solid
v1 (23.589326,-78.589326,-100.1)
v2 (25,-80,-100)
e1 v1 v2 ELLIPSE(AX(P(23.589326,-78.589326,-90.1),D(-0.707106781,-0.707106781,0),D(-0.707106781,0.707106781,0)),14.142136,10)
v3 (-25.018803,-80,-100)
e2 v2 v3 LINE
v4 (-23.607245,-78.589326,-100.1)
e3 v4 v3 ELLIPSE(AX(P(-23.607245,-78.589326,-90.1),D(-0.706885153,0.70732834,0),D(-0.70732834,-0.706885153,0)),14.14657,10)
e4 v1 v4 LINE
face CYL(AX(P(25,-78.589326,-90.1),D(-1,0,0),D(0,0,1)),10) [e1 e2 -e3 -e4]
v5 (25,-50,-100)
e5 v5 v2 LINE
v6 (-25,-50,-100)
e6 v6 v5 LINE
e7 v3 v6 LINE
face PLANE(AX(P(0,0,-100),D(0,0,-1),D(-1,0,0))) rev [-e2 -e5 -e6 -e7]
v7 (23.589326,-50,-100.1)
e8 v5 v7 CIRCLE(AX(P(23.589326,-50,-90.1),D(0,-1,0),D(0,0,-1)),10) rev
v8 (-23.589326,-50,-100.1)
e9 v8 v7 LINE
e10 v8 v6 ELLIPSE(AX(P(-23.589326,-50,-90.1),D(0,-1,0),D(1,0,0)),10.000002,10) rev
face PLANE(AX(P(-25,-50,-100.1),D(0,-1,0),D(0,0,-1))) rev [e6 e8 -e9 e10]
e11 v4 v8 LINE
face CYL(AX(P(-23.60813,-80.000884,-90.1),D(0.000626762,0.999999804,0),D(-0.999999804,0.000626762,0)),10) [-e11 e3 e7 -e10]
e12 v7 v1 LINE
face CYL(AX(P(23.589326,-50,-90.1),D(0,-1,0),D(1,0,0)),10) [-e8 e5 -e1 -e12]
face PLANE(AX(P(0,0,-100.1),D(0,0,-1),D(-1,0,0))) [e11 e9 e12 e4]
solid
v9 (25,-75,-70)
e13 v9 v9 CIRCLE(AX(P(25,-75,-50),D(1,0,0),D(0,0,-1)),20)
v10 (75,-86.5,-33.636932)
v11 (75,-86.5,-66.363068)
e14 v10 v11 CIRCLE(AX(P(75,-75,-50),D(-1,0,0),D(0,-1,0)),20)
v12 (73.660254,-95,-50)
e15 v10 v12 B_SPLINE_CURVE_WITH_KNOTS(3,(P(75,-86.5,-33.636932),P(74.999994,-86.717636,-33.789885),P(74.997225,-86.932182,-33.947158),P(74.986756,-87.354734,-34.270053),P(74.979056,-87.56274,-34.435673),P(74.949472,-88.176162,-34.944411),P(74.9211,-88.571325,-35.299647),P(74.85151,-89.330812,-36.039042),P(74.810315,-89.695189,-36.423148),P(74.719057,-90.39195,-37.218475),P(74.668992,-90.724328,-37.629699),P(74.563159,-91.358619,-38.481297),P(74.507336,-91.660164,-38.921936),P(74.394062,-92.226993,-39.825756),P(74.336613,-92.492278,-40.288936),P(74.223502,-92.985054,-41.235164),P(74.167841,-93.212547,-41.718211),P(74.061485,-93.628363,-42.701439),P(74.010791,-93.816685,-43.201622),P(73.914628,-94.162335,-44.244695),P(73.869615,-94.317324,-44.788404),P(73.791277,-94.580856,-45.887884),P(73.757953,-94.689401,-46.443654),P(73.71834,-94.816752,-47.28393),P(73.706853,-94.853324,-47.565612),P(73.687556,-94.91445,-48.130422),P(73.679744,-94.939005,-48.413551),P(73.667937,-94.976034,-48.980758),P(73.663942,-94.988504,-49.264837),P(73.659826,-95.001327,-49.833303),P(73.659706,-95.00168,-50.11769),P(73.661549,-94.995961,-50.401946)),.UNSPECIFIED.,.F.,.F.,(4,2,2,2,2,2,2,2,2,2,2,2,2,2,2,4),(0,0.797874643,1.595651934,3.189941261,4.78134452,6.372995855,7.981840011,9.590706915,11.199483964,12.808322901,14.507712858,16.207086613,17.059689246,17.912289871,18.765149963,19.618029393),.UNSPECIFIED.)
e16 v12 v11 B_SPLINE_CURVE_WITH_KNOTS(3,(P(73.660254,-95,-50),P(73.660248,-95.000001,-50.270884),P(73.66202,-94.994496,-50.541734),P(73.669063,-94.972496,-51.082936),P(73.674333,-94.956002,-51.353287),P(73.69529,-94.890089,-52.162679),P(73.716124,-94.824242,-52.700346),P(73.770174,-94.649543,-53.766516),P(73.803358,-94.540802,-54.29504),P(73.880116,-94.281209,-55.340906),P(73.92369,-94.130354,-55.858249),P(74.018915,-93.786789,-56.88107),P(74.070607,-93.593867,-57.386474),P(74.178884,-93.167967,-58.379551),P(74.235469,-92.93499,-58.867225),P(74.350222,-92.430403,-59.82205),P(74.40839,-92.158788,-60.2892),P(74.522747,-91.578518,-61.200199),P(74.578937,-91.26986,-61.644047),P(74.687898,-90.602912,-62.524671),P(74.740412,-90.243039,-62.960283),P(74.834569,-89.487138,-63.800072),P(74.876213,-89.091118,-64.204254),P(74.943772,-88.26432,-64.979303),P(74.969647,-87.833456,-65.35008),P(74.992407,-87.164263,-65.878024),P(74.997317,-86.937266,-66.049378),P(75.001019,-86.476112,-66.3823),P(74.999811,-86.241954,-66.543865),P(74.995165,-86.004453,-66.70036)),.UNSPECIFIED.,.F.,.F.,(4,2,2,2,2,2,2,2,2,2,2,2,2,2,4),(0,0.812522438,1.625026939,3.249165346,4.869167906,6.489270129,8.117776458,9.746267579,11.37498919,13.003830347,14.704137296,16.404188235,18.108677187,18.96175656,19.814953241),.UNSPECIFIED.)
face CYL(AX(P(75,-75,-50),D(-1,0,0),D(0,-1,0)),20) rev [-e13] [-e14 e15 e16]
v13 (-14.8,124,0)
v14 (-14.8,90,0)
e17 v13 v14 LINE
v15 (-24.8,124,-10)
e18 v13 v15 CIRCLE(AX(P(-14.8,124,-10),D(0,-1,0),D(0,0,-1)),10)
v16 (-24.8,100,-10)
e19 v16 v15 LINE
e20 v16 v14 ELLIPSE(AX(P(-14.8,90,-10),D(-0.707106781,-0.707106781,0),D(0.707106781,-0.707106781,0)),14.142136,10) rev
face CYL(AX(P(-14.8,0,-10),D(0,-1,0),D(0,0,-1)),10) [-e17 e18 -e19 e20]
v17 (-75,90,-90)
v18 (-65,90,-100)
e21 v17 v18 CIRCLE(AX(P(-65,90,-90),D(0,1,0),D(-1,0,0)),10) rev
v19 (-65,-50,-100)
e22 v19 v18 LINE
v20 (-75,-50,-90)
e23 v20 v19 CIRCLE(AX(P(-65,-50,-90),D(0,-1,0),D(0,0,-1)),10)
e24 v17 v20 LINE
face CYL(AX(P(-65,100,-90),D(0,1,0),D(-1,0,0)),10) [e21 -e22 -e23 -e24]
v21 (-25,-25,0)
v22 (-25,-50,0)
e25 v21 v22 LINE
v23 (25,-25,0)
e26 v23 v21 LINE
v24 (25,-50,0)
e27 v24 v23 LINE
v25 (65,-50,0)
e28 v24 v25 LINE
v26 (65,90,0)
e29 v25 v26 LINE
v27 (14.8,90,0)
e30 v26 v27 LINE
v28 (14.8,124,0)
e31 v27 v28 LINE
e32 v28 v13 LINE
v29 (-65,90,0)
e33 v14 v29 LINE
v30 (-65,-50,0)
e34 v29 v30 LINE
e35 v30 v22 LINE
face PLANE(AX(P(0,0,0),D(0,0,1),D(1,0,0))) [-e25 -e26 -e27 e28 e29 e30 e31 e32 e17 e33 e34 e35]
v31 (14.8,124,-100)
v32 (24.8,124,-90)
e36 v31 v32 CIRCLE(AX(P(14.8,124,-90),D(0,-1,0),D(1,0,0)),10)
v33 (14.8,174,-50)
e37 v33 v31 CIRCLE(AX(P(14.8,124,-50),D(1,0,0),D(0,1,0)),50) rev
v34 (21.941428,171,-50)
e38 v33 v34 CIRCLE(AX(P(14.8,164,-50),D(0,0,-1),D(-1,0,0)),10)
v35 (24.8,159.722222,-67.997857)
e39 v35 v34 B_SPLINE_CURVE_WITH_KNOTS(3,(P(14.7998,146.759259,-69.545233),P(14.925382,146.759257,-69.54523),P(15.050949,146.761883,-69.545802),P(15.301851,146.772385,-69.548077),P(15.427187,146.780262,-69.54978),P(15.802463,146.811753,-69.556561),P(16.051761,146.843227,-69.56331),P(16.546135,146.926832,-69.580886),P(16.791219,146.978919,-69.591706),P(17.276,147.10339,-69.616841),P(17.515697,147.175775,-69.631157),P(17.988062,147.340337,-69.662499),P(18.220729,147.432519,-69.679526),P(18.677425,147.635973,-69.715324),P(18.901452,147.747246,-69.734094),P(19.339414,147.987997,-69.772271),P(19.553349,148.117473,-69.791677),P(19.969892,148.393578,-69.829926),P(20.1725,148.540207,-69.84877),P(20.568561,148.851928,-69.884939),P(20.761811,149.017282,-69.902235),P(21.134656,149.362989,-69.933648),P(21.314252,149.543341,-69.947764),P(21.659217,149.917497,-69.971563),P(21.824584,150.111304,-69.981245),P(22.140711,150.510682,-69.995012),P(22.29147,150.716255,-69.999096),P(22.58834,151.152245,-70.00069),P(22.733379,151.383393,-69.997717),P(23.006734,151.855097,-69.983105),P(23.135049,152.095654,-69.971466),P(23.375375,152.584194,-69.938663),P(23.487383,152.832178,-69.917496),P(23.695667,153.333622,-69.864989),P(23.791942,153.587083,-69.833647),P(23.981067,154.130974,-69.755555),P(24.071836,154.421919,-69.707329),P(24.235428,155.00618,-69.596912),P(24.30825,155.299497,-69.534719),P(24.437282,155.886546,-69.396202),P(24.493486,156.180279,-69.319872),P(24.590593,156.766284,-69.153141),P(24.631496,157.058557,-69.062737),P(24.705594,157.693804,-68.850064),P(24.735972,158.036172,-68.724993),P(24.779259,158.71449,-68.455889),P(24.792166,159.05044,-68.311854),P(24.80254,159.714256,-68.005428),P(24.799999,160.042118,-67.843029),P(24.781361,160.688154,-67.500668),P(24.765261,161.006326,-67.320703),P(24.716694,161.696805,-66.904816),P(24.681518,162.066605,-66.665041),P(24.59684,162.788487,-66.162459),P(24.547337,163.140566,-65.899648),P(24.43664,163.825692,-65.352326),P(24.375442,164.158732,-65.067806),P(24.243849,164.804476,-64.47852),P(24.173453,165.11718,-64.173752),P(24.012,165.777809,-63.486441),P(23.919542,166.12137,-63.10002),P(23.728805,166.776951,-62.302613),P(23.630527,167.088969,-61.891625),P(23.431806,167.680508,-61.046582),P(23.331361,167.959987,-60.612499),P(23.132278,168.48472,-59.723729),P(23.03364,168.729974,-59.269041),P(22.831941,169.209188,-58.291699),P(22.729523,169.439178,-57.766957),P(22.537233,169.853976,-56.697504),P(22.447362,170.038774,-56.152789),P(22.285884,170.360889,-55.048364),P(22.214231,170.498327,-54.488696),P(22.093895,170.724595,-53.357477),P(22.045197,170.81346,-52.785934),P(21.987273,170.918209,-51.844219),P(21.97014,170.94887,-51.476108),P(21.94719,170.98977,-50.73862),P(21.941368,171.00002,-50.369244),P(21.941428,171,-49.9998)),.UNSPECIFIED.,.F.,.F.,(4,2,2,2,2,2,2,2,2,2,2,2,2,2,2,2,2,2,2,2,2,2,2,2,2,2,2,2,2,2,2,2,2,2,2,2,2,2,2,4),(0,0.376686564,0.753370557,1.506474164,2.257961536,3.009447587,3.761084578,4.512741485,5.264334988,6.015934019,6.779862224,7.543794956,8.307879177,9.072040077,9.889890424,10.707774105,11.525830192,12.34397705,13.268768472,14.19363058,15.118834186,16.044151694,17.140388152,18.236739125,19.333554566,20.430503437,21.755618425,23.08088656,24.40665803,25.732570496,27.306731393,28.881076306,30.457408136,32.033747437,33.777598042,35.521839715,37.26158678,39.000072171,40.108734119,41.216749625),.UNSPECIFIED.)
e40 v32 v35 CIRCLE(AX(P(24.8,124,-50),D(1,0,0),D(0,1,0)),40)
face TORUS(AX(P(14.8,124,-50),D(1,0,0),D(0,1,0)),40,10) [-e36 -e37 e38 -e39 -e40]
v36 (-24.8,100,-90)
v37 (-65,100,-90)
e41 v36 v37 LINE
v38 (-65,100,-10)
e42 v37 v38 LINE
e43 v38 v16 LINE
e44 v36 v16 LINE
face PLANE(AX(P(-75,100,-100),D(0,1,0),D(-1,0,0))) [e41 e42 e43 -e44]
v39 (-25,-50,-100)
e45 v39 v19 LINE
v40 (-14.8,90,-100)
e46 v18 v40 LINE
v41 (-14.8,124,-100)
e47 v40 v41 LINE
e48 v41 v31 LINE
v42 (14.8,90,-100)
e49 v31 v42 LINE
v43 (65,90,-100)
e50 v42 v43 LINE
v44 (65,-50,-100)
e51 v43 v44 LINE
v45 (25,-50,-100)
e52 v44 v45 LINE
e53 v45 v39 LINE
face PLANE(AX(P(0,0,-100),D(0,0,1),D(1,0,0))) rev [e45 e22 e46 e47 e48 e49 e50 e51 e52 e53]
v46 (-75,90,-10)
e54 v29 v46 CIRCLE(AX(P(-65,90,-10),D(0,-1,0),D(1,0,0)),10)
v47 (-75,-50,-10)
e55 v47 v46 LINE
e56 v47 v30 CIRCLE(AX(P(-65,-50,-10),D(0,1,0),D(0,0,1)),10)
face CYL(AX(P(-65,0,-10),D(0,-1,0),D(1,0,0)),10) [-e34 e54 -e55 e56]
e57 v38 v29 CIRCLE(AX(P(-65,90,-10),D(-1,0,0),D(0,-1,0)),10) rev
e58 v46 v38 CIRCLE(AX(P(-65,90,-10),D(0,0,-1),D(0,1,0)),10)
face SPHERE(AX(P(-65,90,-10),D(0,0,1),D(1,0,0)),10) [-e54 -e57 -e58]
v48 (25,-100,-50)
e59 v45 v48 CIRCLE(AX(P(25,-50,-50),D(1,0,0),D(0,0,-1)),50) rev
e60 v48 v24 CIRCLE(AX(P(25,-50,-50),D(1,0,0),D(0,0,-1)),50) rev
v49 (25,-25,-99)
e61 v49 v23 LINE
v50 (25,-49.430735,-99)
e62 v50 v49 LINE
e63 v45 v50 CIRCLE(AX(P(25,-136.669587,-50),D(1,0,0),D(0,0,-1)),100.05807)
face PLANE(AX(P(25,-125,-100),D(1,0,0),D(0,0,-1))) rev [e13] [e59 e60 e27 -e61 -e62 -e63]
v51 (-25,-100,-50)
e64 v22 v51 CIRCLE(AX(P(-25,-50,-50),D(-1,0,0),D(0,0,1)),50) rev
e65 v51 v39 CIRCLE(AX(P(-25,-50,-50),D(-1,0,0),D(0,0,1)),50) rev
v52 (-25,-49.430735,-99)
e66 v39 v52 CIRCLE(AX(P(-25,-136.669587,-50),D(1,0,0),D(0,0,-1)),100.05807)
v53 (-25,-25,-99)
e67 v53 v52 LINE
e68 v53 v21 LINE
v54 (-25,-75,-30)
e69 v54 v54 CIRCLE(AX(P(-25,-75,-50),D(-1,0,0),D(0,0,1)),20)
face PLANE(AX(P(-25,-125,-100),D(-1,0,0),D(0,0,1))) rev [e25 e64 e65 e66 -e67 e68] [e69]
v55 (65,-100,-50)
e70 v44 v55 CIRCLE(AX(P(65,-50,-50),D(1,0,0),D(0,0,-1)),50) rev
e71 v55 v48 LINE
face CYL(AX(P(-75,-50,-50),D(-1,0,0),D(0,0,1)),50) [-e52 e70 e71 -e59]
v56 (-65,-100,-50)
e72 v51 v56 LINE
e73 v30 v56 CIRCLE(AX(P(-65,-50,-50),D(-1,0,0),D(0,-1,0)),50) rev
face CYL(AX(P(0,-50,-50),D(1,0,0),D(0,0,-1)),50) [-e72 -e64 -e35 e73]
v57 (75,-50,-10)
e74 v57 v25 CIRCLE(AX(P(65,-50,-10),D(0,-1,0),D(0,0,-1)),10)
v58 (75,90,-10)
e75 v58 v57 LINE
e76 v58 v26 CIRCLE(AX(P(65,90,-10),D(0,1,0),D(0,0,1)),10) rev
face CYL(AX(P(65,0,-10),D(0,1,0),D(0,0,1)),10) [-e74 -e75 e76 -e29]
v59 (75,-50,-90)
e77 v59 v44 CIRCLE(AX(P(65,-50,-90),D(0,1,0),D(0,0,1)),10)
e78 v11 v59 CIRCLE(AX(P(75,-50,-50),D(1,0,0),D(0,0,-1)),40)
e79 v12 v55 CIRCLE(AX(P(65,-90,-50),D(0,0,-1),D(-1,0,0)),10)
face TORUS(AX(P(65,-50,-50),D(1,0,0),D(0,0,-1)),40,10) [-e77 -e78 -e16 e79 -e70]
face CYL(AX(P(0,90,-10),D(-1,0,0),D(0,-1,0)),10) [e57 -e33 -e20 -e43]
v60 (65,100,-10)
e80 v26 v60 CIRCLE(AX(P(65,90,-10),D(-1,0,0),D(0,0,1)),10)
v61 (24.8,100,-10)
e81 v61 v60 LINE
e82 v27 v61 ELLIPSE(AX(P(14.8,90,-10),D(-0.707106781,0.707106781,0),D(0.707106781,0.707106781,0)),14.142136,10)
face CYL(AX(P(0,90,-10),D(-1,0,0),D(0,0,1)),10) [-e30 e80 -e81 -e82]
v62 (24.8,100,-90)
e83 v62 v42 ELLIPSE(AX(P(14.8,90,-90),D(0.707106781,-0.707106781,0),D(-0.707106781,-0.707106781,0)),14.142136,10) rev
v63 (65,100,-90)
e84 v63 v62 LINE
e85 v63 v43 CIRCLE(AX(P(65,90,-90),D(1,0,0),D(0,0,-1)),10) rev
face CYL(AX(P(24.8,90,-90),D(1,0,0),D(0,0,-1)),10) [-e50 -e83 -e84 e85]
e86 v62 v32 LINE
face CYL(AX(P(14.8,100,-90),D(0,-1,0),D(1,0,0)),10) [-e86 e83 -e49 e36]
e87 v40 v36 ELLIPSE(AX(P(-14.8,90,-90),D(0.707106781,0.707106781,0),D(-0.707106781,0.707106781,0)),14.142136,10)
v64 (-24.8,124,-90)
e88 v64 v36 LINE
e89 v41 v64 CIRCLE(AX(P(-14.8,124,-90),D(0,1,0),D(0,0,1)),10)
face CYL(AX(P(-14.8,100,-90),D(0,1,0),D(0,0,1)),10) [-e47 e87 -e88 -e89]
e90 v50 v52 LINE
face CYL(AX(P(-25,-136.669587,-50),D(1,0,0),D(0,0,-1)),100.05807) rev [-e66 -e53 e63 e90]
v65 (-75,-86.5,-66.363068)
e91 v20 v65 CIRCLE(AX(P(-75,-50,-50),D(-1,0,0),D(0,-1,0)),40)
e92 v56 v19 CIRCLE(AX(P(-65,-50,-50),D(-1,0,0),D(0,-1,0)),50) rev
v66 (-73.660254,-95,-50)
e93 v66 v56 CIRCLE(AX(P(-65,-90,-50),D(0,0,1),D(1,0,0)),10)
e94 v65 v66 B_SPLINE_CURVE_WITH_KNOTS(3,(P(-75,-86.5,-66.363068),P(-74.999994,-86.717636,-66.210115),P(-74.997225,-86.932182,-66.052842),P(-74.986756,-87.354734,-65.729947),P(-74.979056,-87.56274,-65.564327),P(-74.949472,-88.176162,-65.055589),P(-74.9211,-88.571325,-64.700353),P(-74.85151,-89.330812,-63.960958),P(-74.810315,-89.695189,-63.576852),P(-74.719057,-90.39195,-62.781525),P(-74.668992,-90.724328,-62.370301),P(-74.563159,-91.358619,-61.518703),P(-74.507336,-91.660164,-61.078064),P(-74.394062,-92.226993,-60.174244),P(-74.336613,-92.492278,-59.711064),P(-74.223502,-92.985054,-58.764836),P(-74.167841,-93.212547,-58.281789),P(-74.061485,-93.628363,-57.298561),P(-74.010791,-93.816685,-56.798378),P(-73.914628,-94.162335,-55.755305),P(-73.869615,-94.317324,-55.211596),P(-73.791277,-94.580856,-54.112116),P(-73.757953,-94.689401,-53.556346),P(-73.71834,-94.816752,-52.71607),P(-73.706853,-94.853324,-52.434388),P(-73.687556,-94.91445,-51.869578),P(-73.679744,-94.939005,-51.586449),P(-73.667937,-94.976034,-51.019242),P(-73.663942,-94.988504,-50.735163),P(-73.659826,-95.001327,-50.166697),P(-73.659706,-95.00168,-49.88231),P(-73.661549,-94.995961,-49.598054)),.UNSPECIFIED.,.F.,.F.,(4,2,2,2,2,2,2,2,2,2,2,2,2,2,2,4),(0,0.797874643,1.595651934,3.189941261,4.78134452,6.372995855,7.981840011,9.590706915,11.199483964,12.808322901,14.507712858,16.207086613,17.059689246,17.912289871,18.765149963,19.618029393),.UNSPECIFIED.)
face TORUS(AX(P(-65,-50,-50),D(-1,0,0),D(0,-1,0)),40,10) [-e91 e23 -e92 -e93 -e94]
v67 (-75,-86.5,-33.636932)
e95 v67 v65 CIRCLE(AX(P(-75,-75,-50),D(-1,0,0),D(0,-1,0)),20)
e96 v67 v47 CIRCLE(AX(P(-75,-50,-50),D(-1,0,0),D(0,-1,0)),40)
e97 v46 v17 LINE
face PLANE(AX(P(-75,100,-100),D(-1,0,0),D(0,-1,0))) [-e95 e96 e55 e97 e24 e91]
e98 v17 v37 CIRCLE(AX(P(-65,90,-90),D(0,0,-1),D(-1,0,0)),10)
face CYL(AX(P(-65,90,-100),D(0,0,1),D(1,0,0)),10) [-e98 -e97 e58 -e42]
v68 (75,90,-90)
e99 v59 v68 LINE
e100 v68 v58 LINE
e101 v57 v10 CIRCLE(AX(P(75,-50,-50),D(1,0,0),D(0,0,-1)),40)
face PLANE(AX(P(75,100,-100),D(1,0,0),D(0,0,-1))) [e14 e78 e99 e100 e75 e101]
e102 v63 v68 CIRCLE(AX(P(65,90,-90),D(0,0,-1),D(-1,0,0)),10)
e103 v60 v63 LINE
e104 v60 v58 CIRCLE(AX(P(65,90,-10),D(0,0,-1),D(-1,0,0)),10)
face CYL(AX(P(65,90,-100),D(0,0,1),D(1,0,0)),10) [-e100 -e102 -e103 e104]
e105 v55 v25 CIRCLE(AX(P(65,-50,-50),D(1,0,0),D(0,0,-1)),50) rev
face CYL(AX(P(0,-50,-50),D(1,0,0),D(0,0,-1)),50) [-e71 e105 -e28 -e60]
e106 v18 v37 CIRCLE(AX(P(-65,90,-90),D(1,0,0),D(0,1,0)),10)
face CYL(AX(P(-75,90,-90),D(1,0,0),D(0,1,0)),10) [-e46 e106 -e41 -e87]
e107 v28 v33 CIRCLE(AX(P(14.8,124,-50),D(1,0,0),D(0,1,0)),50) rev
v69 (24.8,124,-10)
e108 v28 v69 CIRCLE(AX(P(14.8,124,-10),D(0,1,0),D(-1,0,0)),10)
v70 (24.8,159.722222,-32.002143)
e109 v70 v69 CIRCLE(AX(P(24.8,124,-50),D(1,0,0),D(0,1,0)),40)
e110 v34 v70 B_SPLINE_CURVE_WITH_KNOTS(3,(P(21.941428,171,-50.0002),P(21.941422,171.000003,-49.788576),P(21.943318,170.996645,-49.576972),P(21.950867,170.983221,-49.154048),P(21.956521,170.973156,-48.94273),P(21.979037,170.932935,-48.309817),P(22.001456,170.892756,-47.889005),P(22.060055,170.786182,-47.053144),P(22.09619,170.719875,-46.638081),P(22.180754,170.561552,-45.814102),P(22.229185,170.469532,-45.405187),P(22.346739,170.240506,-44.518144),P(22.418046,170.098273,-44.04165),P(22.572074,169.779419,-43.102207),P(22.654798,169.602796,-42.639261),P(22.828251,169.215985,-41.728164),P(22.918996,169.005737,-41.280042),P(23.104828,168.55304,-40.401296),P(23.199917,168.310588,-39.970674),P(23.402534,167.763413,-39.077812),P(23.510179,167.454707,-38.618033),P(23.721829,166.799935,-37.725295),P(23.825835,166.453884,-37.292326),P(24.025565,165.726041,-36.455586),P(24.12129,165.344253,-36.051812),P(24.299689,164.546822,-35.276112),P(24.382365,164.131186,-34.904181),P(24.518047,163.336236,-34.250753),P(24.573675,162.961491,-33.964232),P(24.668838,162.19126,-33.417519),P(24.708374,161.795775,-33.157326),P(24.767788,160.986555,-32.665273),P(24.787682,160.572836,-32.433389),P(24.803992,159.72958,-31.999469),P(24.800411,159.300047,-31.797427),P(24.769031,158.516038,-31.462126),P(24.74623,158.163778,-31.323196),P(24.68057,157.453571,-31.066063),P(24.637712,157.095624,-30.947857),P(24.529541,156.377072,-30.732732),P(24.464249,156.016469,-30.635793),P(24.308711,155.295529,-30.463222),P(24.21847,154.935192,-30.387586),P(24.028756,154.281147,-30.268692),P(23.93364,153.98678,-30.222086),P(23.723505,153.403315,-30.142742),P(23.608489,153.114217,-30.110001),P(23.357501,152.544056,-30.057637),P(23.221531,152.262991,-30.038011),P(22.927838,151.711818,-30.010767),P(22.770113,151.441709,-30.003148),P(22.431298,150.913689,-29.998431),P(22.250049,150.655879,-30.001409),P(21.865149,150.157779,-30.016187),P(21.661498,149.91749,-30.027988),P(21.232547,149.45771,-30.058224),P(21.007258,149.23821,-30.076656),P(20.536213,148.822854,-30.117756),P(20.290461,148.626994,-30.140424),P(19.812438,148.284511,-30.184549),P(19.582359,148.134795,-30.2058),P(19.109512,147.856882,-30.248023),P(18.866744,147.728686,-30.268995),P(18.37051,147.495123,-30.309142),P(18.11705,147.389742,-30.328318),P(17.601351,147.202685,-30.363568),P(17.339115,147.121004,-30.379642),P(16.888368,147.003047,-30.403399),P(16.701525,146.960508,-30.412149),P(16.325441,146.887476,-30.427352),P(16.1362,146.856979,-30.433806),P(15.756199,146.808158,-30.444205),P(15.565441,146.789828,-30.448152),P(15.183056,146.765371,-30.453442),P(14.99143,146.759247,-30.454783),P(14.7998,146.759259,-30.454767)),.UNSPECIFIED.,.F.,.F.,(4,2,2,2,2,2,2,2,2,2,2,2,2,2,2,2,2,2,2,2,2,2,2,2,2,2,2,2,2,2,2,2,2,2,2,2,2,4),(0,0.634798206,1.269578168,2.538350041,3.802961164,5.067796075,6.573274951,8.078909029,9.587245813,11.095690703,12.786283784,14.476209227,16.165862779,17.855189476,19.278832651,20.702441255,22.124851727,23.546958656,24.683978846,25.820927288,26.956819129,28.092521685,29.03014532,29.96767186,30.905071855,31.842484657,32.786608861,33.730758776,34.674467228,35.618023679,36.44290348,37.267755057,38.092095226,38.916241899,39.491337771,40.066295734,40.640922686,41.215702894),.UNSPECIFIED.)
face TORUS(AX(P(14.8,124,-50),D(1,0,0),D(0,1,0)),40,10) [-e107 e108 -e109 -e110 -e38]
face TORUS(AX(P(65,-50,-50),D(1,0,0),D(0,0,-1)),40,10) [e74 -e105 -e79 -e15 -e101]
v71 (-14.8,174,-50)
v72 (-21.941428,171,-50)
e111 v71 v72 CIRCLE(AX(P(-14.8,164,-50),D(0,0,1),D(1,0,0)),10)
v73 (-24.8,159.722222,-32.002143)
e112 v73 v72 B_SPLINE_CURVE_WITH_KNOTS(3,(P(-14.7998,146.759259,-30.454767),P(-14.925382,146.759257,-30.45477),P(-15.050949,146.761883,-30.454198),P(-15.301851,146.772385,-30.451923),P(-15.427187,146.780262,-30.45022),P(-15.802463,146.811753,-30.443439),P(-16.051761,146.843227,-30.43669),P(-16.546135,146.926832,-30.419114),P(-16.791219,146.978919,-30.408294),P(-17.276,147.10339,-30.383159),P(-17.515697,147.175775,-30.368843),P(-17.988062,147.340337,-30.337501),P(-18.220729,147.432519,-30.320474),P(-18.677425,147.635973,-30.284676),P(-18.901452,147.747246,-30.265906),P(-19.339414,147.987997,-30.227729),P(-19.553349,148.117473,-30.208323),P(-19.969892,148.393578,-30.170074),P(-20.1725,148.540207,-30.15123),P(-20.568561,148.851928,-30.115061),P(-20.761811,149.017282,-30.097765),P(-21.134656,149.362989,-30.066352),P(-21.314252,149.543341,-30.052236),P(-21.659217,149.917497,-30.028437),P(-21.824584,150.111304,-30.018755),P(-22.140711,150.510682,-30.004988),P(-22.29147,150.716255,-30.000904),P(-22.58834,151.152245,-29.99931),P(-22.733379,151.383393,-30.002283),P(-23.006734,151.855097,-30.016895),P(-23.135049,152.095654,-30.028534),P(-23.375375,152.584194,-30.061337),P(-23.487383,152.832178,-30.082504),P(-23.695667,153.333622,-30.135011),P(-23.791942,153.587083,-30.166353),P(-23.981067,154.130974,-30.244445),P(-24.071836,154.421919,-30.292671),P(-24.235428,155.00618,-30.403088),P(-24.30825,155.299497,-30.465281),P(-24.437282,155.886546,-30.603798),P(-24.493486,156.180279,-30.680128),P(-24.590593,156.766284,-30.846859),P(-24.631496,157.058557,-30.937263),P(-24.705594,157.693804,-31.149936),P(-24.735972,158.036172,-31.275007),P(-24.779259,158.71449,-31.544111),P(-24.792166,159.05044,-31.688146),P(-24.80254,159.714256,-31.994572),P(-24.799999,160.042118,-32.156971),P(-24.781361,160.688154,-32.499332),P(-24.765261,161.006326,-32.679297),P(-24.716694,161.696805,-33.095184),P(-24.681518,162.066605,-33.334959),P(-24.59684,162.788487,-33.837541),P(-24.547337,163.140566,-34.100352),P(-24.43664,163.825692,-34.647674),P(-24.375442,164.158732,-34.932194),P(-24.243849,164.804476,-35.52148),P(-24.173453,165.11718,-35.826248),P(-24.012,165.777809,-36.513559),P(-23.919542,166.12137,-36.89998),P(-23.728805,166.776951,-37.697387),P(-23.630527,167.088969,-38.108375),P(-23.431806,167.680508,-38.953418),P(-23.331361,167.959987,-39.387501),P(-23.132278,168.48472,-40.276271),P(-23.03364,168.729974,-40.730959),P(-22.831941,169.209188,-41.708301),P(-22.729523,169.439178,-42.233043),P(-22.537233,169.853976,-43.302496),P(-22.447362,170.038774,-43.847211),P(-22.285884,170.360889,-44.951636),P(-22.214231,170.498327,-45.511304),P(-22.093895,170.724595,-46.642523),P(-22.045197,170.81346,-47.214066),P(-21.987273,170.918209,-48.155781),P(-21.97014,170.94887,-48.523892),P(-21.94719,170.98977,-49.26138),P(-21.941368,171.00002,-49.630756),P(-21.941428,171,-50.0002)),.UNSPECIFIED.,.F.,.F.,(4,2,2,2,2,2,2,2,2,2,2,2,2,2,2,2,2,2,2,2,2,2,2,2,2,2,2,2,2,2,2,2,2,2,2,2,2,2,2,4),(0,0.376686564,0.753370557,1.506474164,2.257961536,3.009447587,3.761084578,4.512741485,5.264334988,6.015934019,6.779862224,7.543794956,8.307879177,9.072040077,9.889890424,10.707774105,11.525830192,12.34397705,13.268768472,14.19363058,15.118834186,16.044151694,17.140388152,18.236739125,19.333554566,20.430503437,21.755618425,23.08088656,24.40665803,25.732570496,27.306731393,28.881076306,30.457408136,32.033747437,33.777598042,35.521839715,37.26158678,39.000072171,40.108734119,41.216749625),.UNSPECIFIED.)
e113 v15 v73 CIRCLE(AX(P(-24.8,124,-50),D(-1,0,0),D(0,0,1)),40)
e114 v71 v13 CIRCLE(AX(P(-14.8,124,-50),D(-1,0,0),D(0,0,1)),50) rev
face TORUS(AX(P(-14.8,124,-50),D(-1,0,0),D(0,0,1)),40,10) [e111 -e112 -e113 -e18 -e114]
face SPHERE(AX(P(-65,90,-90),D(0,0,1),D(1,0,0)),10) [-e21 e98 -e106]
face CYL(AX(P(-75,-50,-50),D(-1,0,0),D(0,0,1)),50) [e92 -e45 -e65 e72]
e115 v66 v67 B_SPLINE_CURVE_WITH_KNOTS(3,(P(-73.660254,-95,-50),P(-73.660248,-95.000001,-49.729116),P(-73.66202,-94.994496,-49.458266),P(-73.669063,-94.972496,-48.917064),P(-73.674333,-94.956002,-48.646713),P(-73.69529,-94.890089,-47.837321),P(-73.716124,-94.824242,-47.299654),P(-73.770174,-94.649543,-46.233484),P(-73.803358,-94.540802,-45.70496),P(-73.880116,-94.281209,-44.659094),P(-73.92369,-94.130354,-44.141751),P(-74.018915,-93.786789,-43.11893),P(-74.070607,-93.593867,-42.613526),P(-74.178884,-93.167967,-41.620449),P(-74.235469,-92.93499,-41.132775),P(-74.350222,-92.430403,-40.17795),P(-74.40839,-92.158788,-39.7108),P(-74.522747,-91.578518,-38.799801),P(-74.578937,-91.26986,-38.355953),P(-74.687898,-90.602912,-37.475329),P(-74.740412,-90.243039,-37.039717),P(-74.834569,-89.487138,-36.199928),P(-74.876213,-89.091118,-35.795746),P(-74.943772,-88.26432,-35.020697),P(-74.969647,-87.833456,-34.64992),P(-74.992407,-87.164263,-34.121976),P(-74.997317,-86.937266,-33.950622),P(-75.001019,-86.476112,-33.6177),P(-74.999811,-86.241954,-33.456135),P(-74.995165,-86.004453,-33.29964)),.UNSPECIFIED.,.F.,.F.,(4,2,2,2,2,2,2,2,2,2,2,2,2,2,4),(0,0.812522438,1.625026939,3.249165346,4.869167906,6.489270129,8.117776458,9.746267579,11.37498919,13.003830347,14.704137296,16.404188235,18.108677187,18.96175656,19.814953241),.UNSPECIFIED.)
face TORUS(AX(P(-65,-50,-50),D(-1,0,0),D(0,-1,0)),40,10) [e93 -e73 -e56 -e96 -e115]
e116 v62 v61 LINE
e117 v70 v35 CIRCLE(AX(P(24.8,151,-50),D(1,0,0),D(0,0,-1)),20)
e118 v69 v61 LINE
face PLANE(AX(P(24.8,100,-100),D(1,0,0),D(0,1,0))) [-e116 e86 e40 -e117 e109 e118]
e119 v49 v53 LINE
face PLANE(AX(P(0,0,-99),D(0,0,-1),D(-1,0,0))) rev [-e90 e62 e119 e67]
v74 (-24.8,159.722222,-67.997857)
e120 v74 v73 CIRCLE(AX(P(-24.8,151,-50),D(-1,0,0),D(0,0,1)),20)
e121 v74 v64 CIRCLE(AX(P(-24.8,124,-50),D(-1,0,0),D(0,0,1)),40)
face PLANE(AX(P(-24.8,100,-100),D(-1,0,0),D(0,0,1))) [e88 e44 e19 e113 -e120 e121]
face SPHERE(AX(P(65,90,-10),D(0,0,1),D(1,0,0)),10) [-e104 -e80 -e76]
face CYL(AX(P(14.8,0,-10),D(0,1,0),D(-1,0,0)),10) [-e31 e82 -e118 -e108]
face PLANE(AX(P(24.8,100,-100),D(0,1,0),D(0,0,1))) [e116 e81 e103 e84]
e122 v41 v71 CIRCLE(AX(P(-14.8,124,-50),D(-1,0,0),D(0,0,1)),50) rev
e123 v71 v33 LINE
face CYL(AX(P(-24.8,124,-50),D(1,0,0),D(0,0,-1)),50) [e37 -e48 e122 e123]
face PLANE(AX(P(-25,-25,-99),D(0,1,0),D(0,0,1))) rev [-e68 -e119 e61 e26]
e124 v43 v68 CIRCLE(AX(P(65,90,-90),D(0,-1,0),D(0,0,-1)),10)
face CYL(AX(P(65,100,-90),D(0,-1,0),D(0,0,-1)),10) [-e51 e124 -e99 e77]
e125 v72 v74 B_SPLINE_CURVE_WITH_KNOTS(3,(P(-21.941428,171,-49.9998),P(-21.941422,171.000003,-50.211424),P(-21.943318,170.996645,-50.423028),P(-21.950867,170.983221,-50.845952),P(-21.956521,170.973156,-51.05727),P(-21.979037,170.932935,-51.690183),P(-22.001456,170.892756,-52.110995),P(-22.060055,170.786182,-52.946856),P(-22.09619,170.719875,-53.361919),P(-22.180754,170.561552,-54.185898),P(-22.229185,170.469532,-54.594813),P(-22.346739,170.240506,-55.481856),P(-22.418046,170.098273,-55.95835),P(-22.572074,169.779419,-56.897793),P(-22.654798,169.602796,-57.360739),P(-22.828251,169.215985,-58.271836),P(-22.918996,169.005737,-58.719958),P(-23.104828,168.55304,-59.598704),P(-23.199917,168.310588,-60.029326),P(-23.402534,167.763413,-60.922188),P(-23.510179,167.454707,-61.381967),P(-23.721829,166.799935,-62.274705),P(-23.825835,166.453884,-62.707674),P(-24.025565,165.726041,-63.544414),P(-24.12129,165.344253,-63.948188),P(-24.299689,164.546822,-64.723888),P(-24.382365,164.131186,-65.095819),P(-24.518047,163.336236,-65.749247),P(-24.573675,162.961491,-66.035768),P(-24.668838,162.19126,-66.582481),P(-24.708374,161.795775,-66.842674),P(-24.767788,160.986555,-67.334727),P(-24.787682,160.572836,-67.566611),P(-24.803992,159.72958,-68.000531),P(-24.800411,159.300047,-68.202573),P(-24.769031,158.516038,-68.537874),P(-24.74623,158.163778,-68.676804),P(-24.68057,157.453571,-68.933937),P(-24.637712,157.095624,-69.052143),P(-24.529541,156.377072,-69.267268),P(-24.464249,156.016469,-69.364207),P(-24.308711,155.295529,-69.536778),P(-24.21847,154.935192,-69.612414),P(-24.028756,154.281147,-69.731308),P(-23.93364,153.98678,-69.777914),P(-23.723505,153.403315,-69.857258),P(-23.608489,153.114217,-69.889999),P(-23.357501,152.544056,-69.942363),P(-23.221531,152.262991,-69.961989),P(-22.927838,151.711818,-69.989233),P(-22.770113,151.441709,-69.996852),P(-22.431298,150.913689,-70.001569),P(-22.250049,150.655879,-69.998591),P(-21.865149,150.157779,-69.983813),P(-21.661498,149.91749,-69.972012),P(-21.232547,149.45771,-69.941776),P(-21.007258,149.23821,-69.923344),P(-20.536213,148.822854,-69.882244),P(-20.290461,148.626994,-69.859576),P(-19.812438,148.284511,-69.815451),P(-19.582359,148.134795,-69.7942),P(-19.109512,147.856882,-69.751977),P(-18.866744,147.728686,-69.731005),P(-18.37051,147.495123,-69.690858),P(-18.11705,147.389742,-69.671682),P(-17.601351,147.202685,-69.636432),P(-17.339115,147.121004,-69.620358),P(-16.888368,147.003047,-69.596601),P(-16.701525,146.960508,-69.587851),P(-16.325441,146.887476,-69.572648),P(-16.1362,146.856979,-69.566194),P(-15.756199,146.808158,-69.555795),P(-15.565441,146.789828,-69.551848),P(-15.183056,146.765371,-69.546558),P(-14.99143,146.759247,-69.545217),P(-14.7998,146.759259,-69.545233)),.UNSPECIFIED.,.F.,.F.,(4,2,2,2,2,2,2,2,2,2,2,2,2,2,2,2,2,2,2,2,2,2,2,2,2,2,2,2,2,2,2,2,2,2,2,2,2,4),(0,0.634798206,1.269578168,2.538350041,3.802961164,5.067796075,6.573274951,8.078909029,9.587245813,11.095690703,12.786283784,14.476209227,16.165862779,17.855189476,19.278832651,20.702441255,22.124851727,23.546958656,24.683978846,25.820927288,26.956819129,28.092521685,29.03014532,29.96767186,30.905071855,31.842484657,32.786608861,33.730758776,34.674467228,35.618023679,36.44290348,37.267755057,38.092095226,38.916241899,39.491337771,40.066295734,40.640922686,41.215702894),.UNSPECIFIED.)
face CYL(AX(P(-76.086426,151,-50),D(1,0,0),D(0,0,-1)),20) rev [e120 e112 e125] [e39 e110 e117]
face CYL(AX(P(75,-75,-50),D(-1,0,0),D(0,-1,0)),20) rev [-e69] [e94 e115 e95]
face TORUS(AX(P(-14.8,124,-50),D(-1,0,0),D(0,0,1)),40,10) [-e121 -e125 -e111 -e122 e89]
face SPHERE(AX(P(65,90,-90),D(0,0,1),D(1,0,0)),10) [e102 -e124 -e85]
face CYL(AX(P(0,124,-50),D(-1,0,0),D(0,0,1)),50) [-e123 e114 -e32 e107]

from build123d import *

# Parameters (mm, degrees)
BOSS_EXTRUDE1_DEPTH    = 100
SKETCH2_W              = 50
SKETCH2_H              = 50
CUT_EXTRUDE1_DEPTH     = 215.245186644
FILLET1_R              = 50
CUT_EXTRUDE2_DEPTH     = 25
SKETCH7_R              = 20
CUT_EXTRUDE3_DEPTH     = 251.551391934
FILLET2_R              = 50
CUT_EXTRUDE6_START     = -100
CUT_EXTRUDE6_OUTLINE_W = 50
CUT_EXTRUDE6_OUTLINE_H = 6.698729811
CUT_EXTRUDE6_DEPTH     = 50
CUT_EXTRUDE7_DEPTH     = 25
FILLET3_R              = 10
SKETCH11_W             = 50
SKETCH11_H             = 25
CUT_EXTRUDE8_DEPTH     = 99
BOSS_EXTRUDE7_DEPTH    = 0.1
FILLET4_R              = 10
FILLET5_R              = 10
SKETCH14_R             = 20
CUT_EXTRUDE9_DEPTH     = 225.178611948


with BuildPart() as part:
    # Sketch1 → Boss-Extrude1 (new body)
    with BuildSketch(Plane.XY):
        Polygon((-24.8, 100), (-24.8, 174), (24.8, 174), (24.8, 100), (75, 100), (75, -100), (-75, -100), (-75, 100), align=None)
    extrude(amount=-BOSS_EXTRUDE1_DEPTH)

    # Sketch2 → Cut-Extrude1 (cut, through all)
    with BuildSketch(Plane.XY):
        with Locations((0, -100)):
            Rectangle(SKETCH2_W, SKETCH2_H)
    extrude(amount=-CUT_EXTRUDE1_DEPTH, mode=Mode.SUBTRACT)

    # Fillet1
    fillet1_edges = [part.edges().sort_by_distance(p)[0] for p in [
        (0, 174, -100),
        (0, 174, 0),
    ]]
    fillet(fillet1_edges, radius=FILLET1_R - 0.0001)  # a hair under: the kernel refuses the full size

    # Sketch6 → Cut-Extrude2 (cut, symmetric)
    with BuildSketch(Plane(origin=(0, 0, 0), x_dir=(0, 0, -1), z_dir=(1, 0, 0))):
        with BuildLine():
            Line((100, -75), (0, -75))
            ThreePointArc((0, -75), (50, -25), (100, -75))
        make_face()
    extrude(amount=CUT_EXTRUDE2_DEPTH, both=True, mode=Mode.SUBTRACT)

    # Sketch7 → Cut-Extrude3 (cut, through all)
    with BuildSketch(Plane.ZY.offset(75)):
        with Locations(Location((-50, -75, 0), (0, 0, 270))):
            Circle(SKETCH7_R)
    extrude(amount=-CUT_EXTRUDE3_DEPTH, mode=Mode.SUBTRACT)

    # Fillet2
    fillet2_edges = [part.edges().sort_by_distance(p)[0] for p in [
        (-50, -100, -100),
        (-50, -100, 0),
    ]]
    fillet(fillet2_edges, radius=FILLET2_R - 0.0001)  # a hair under: the kernel refuses the full size

    # Cut-Extrude6: read off the stored shape, not the designer's step
    # Cut-Extrude6 outline → Cut-Extrude6 (cut)
    with BuildSketch(Plane(origin=(0, 0, 0), x_dir=(1, 0, 0), z_dir=(0, 1, 0)).offset(CUT_EXTRUDE6_START)):
        with Locations((0, 96.650635095)):
            Rectangle(CUT_EXTRUDE6_OUTLINE_W, CUT_EXTRUDE6_OUTLINE_H)
        with Locations((0, 3.349364906)):
            Rectangle(CUT_EXTRUDE6_OUTLINE_W, CUT_EXTRUDE6_OUTLINE_H)
    extrude(amount=CUT_EXTRUDE6_DEPTH, mode=Mode.SUBTRACT)

    # Sketch10 → Cut-Extrude7 (cut, symmetric)
    with BuildSketch(Plane(origin=(0, 0, 0), x_dir=(0, 0, -1), z_dir=(1, 0, 0))):
        with BuildLine():
            Line((0, -50), (100, -50))
            ThreePointArc((100, -50), (50, -36.611517322), (0, -50))
        make_face()
    extrude(amount=CUT_EXTRUDE7_DEPTH, both=True, mode=Mode.SUBTRACT)

    # Fillet3
    # the kernel refuses this fillet: 10 mm, written as the material it takes off along each edge
    with BuildSketch(Plane(origin=(24.8, 124.0001, -100), x_dir=(0, 0, 1), z_dir=(0, -1, 0)), Plane(origin=(-24.8, 100, 0), x_dir=(1, 0, 0), z_dir=(0, 1, 0)), Plane(origin=(-24.8, 100, -100), x_dir=(0, 0, 1), z_dir=(0, 1, 0)), Plane(origin=(24.8, 124.0001, 0), x_dir=(-1, 0, 0), z_dir=(0, -1, 0))) as fillet3_piece_1:
        with BuildLine():
            CenterArc((FILLET3_R, FILLET3_R), FILLET3_R, 180, 90)
            Line((0, FILLET3_R), (0, 0))
            Line((0, 0), (FILLET3_R, 0))
        make_face()
    extrude(amount=24.0001, mode=Mode.SUBTRACT)
    with BuildSketch(Plane(origin=(24.8, 100, 0), x_dir=(0, -1, 0), z_dir=(1, 0, 0)), Plane(origin=(-100, 100, -100), x_dir=(0, 0, 1), z_dir=(1, 0, 0)), Plane(origin=(24.8, 100, -100), x_dir=(0, 0, 1), z_dir=(1, 0, 0)), Plane(origin=(-100, 100, 0), x_dir=(0, -1, 0), z_dir=(1, 0, 0))) as fillet3_piece_2:
        with BuildLine():
            CenterArc((FILLET3_R, FILLET3_R), FILLET3_R, 180, 90)
            Line((0, FILLET3_R), (0, 0))
            Line((0, 0), (FILLET3_R, 0))
        make_face()
    extrude(amount=75.2, mode=Mode.SUBTRACT)
    with BuildSketch(Plane(origin=(-75, -50.0001, -100), x_dir=(0, 0, 1), z_dir=(0, 1, 0)), Plane(origin=(75, 125, 0), x_dir=(-1, 0, 0), z_dir=(0, -1, 0)), Plane(origin=(75, 125, -100), x_dir=(0, 0, 1), z_dir=(0, -1, 0)), Plane(origin=(-75, -50.0001, 0), x_dir=(1, 0, 0), z_dir=(0, 1, 0))) as fillet3_piece_3:
        with BuildLine():
            CenterArc((FILLET3_R, FILLET3_R), FILLET3_R, 180, 90)
            Line((0, FILLET3_R), (0, 0))
            Line((0, 0), (FILLET3_R, 0))
        make_face()
    extrude(amount=175.0001, mode=Mode.SUBTRACT)
    with BuildSketch(Plane(origin=(-24.8, 124.0001, -49.9999), x_dir=(0, 1, 0), z_dir=(0, 0, -1))) as fillet3_piece_4:
        with BuildLine():
            CenterArc((49.9999 - FILLET3_R, FILLET3_R), FILLET3_R, 270, 90)
            Line((49.9999 - FILLET3_R, 0), (49.9999, 0))
            Line((49.9999, 0), (49.9999, FILLET3_R))
        make_face()
    revolve(axis=Axis((-24.8, 124.0001, -49.9999), (1, 0, 0)), revolution_arc=90, mode=Mode.SUBTRACT)
    with BuildSketch(Plane(origin=(-24.8, 124.0001, -50.0001), x_dir=(0, 1, 0), z_dir=(0, 0, 1))) as fillet3_piece_5:
        with BuildLine():
            CenterArc((49.9999 - FILLET3_R, -FILLET3_R), FILLET3_R, 0, 90)
            Line((49.9999, -FILLET3_R), (49.9999, 0))
            Line((49.9999, 0), (49.9999 - FILLET3_R, 0))
        make_face()
    revolve(axis=Axis((-24.8, 124.0001, -50.0001), (-1, 0, 0)), revolution_arc=90, mode=Mode.SUBTRACT)
    with BuildSketch(Plane(origin=(24.8, 124.0001, -49.9999), x_dir=(0, 1, 0), z_dir=(0, 0, -1))) as fillet3_piece_6:
        with BuildLine():
            CenterArc((49.9999 - FILLET3_R, -FILLET3_R), FILLET3_R, 0, 90)
            Line((49.9999, -FILLET3_R), (49.9999, 0))
            Line((49.9999, 0), (49.9999 - FILLET3_R, 0))
        make_face()
    revolve(axis=Axis((24.8, 124.0001, -49.9999), (1, 0, 0)), revolution_arc=90, mode=Mode.SUBTRACT)
    with BuildSketch(Plane(origin=(24.8, 124.0001, -50.0001), x_dir=(0, 1, 0), z_dir=(0, 0, 1))) as fillet3_piece_7:
        with BuildLine():
            CenterArc((49.9999 - FILLET3_R, FILLET3_R), FILLET3_R, 270, 90)
            Line((49.9999, FILLET3_R), (49.9999, 0))
            Line((49.9999, 0), (49.9999 - FILLET3_R, 0))
        make_face()
    revolve(axis=Axis((24.8, 124.0001, -50.0001), (-1, 0, 0)), revolution_arc=90, mode=Mode.SUBTRACT)
    with BuildSketch(Plane(origin=(75, -50.0001, -49.9999), x_dir=(0, 0, 1), z_dir=(0, 1, 0))) as fillet3_piece_8:
        with BuildLine():
            CenterArc((49.9999 - FILLET3_R, -FILLET3_R), FILLET3_R, 0, 90)
            Line((49.9999, -FILLET3_R), (49.9999, 0))
            Line((49.9999, 0), (49.9999 - FILLET3_R, 0))
        make_face()
    revolve(axis=Axis((75, -50.0001, -49.9999), (1, 0, 0)), revolution_arc=90, mode=Mode.SUBTRACT)
    with BuildSketch(Plane(origin=(75, -50.0001, -50.0001), x_dir=(0, 0, -1), z_dir=(0, 1, 0))) as fillet3_piece_9:
        with BuildLine():
            CenterArc((49.9999 - FILLET3_R, FILLET3_R), FILLET3_R, 270, 90)
            Line((49.9999, FILLET3_R), (49.9999, 0))
            Line((49.9999, 0), (49.9999 - FILLET3_R, 0))
        make_face()
    revolve(axis=Axis((75, -50.0001, -50.0001), (-1, 0, 0)), revolution_arc=90, mode=Mode.SUBTRACT)
    with BuildSketch(Plane(origin=(-75, -50.0001, -49.9999), x_dir=(0, 0, 1), z_dir=(0, 1, 0))) as fillet3_piece_10:
        with BuildLine():
            CenterArc((49.9999 - FILLET3_R, FILLET3_R), FILLET3_R, 270, 90)
            Line((49.9999, FILLET3_R), (49.9999, 0))
            Line((49.9999, 0), (49.9999 - FILLET3_R, 0))
        make_face()
    revolve(axis=Axis((-75, -50.0001, -49.9999), (1, 0, 0)), revolution_arc=90, mode=Mode.SUBTRACT)
    with BuildSketch(Plane(origin=(-75, -50.0001, -50.0001), x_dir=(0, 0, -1), z_dir=(0, 1, 0))) as fillet3_piece_11:
        with BuildLine():
            CenterArc((49.9999 - FILLET3_R, -FILLET3_R), FILLET3_R, 0, 90)
            Line((49.9999, -FILLET3_R), (49.9999, 0))
            Line((49.9999, 0), (49.9999 - FILLET3_R, 0))
        make_face()
    revolve(axis=Axis((-75, -50.0001, -50.0001), (-1, 0, 0)), revolution_arc=90, mode=Mode.SUBTRACT)
    with BuildSketch(Plane(origin=(-75, -100, -49.9999), x_dir=(0, 1, 0), z_dir=(0, 0, -1)), Plane(origin=(24.8, 174, -49.9999), x_dir=(0, -1, 0), z_dir=(0, 0, -1))) as fillet3_piece_12:
        with BuildLine():
            CenterArc((FILLET3_R, FILLET3_R), FILLET3_R, 180, 90)
            Line((0, FILLET3_R), (0, 0))
            Line((0, 0), (FILLET3_R, 0))
        make_face()
    extrude(amount=0.0002, mode=Mode.SUBTRACT)
    with BuildSketch(Plane(origin=(75, -100, -49.9999), x_dir=(0, 1, 0), z_dir=(0, 0, -1)), Plane(origin=(-24.8, 174, -49.9999), x_dir=(0, -1, 0), z_dir=(0, 0, -1))) as fillet3_piece_13:
        with BuildLine():
            CenterArc((FILLET3_R, -FILLET3_R), FILLET3_R, 90, 90)
            Line((0, -FILLET3_R), (0, 0))
            Line((0, 0), (FILLET3_R, 0))
        make_face()
    extrude(amount=0.0002, mode=Mode.SUBTRACT)
    with BuildSketch(Plane(origin=(-0.2, 100, -100), x_dir=(0, 0, 1), z_dir=(1, 0, 0))) as fillet3_piece_14a_section:
        with BuildLine():
            CenterArc((FILLET3_R, FILLET3_R), FILLET3_R, 180, 90)
            Line((0, FILLET3_R), (0, 0))
            Line((0, 0), (FILLET3_R, 0))
        make_face()
    fillet3_piece_14a = extrude(amount=100.2, mode=Mode.PRIVATE)
    fillet3_piece_14a = split(fillet3_piece_14a, bisect_by=Plane(origin=(24.8, 100, -100), z_dir=(-1, 0, 0)), keep=Keep.TOP, mode=Mode.PRIVATE)
    with BuildSketch(Plane(origin=(24.8, 124.0001, -100), x_dir=(0, 0, 1), z_dir=(0, -1, 0))) as fillet3_piece_14b_section:
        with BuildLine():
            CenterArc((FILLET3_R, FILLET3_R), FILLET3_R, 180, 90)
            Line((0, FILLET3_R), (0, 0))
            Line((0, 0), (FILLET3_R, 0))
        make_face()
    fillet3_piece_14b = extrude(amount=49.0001, mode=Mode.PRIVATE)
    fillet3_piece_14b = split(fillet3_piece_14b, bisect_by=Plane(origin=(24.8, 100, -100), z_dir=(0, -1, 0)), keep=Keep.TOP, mode=Mode.PRIVATE)
    fillet3_piece_14 = fillet3_piece_14a & fillet3_piece_14b
    add(fillet3_piece_14, mode=Mode.SUBTRACT)
    with BuildSketch(Plane(origin=(-0.2, 100, 0), x_dir=(0, -1, 0), z_dir=(1, 0, 0))) as fillet3_piece_15a_section:
        with BuildLine():
            CenterArc((FILLET3_R, FILLET3_R), FILLET3_R, 180, 90)
            Line((0, FILLET3_R), (0, 0))
            Line((0, 0), (FILLET3_R, 0))
        make_face()
    fillet3_piece_15a = extrude(amount=100.2, mode=Mode.PRIVATE)
    fillet3_piece_15a = split(fillet3_piece_15a, bisect_by=Plane(origin=(24.8, 100, 0), z_dir=(-1, 0, 0)), keep=Keep.TOP, mode=Mode.PRIVATE)
    with BuildSketch(Plane(origin=(24.8, 124.0001, 0), x_dir=(-1, 0, 0), z_dir=(0, -1, 0))) as fillet3_piece_15b_section:
        with BuildLine():
            CenterArc((FILLET3_R, FILLET3_R), FILLET3_R, 180, 90)
            Line((0, FILLET3_R), (0, 0))
            Line((0, 0), (FILLET3_R, 0))
        make_face()
    fillet3_piece_15b = extrude(amount=49.0001, mode=Mode.PRIVATE)
    fillet3_piece_15b = split(fillet3_piece_15b, bisect_by=Plane(origin=(24.8, 100, 0), z_dir=(0, -1, 0)), keep=Keep.TOP, mode=Mode.PRIVATE)
    fillet3_piece_15 = fillet3_piece_15a & fillet3_piece_15b
    add(fillet3_piece_15, mode=Mode.SUBTRACT)
    with BuildSketch(Plane(origin=(-24.8, 75, -100), x_dir=(0, 0, 1), z_dir=(0, 1, 0))) as fillet3_piece_16a_section:
        with BuildLine():
            CenterArc((FILLET3_R, FILLET3_R), FILLET3_R, 180, 90)
            Line((0, FILLET3_R), (0, 0))
            Line((0, 0), (FILLET3_R, 0))
        make_face()
    fillet3_piece_16a = extrude(amount=49.0001, mode=Mode.PRIVATE)
    fillet3_piece_16a = split(fillet3_piece_16a, bisect_by=Plane(origin=(-24.8, 100, -100), z_dir=(0, -1, 0)), keep=Keep.TOP, mode=Mode.PRIVATE)
    with BuildSketch(Plane(origin=(-100, 100, -100), x_dir=(0, 0, 1), z_dir=(1, 0, 0))) as fillet3_piece_16b_section:
        with BuildLine():
            CenterArc((FILLET3_R, FILLET3_R), FILLET3_R, 180, 90)
            Line((0, FILLET3_R), (0, 0))
            Line((0, 0), (FILLET3_R, 0))
        make_face()
    fillet3_piece_16b = extrude(amount=100.2, mode=Mode.PRIVATE)
    fillet3_piece_16b = split(fillet3_piece_16b, bisect_by=Plane(origin=(-24.8, 100, -100), z_dir=(1, 0, 0)), keep=Keep.TOP, mode=Mode.PRIVATE)
    fillet3_piece_16 = fillet3_piece_16a & fillet3_piece_16b
    add(fillet3_piece_16, mode=Mode.SUBTRACT)
    with BuildSketch(Plane(origin=(-24.8, 75, 0), x_dir=(1, 0, 0), z_dir=(0, 1, 0))) as fillet3_piece_17a_section:
        with BuildLine():
            CenterArc((FILLET3_R, FILLET3_R), FILLET3_R, 180, 90)
            Line((0, FILLET3_R), (0, 0))
            Line((0, 0), (FILLET3_R, 0))
        make_face()
    fillet3_piece_17a = extrude(amount=49.0001, mode=Mode.PRIVATE)
    fillet3_piece_17a = split(fillet3_piece_17a, bisect_by=Plane(origin=(-24.8, 100, 0), z_dir=(0, -1, 0)), keep=Keep.TOP, mode=Mode.PRIVATE)
    with BuildSketch(Plane(origin=(-100, 100, 0), x_dir=(0, -1, 0), z_dir=(1, 0, 0))) as fillet3_piece_17b_section:
        with BuildLine():
            CenterArc((FILLET3_R, FILLET3_R), FILLET3_R, 180, 90)
            Line((0, FILLET3_R), (0, 0))
            Line((0, 0), (FILLET3_R, 0))
        make_face()
    fillet3_piece_17b = extrude(amount=100.2, mode=Mode.PRIVATE)
    fillet3_piece_17b = split(fillet3_piece_17b, bisect_by=Plane(origin=(-24.8, 100, 0), z_dir=(1, 0, 0)), keep=Keep.TOP, mode=Mode.PRIVATE)
    fillet3_piece_17 = fillet3_piece_17a & fillet3_piece_17b
    add(fillet3_piece_17, mode=Mode.SUBTRACT)

    # Sketch11 → Cut-Extrude8 (cut)
    with BuildSketch(Plane.XY):
        with Locations((0, -37.5)):
            Rectangle(SKETCH11_W, SKETCH11_H)
    extrude(amount=-CUT_EXTRUDE8_DEPTH, mode=Mode.SUBTRACT)

    # Fillet5
    # the kernel refuses this fillet: 10 mm, written as the material it takes off along each edge
    with BuildSketch(Plane(origin=(65, 90, -10), x_dir=(0, 1, 0), z_dir=(1, 0, 0))) as fillet5_piece_1_section:
        Polygon((0, 0), (FILLET5_R, 0), (FILLET5_R, FILLET5_R), (0, FILLET5_R), align=None)
    fillet5_piece_1 = extrude(amount=FILLET5_R, mode=Mode.PRIVATE)
    fillet5_piece_1 = fillet5_piece_1 - Plane(origin=(65, 90, -10), x_dir=(0, -0.7071067811865475, -0.7071067811865475), z_dir=(1, 0, 0)) * Sphere(FILLET5_R, mode=Mode.PRIVATE)
    add(fillet5_piece_1, mode=Mode.SUBTRACT)
    with BuildSketch(Plane(origin=(65, 90, -90), x_dir=(0, 1, 0), z_dir=(1, 0, 0))) as fillet5_piece_2_section:
        Polygon((0, 0), (FILLET5_R, 0), (FILLET5_R, -FILLET5_R), (0, -FILLET5_R), align=None)
    fillet5_piece_2 = extrude(amount=FILLET5_R, mode=Mode.PRIVATE)
    fillet5_piece_2 = fillet5_piece_2 - Plane(origin=(65, 90, -90), x_dir=(0, -0.7071067811865475, 0.7071067811865475), z_dir=(1, 0, 0)) * Sphere(FILLET5_R, mode=Mode.PRIVATE)
    add(fillet5_piece_2, mode=Mode.SUBTRACT)
    with BuildSketch(Plane(origin=(-65, 90, -90), x_dir=(0, 1, 0), z_dir=(-1, 0, 0))) as fillet5_piece_3_section:
        Polygon((0, 0), (FILLET5_R, 0), (FILLET5_R, FILLET5_R), (0, FILLET5_R), align=None)
    fillet5_piece_3 = extrude(amount=FILLET5_R, mode=Mode.PRIVATE)
    fillet5_piece_3 = fillet5_piece_3 - Plane(origin=(-65, 90, -90), x_dir=(0, -0.7071067811865475, 0.7071067811865475), z_dir=(-1, 0, 0)) * Sphere(FILLET5_R, mode=Mode.PRIVATE)
    add(fillet5_piece_3, mode=Mode.SUBTRACT)
    with BuildSketch(Plane(origin=(-65, 90, -10), x_dir=(0, 1, 0), z_dir=(-1, 0, 0))) as fillet5_piece_4_section:
        Polygon((0, 0), (FILLET5_R, 0), (FILLET5_R, -FILLET5_R), (0, -FILLET5_R), align=None)
    fillet5_piece_4 = extrude(amount=FILLET5_R, mode=Mode.PRIVATE)
    fillet5_piece_4 = fillet5_piece_4 - Plane(origin=(-65, 90, -10), x_dir=(0, -0.7071067811865475, -0.7071067811865475), z_dir=(-1, 0, 0)) * Sphere(FILLET5_R, mode=Mode.PRIVATE)
    add(fillet5_piece_4, mode=Mode.SUBTRACT)
    with BuildSketch(Plane(origin=(75, 100, -10), x_dir=(0, -1, 0), z_dir=(0, 0, -1))) as fillet5_piece_5:
        with BuildLine():
            CenterArc((FILLET5_R, FILLET5_R), FILLET5_R, 180, 90)
            Line((0, FILLET5_R), (0, 0))
            Line((0, 0), (FILLET5_R, 0))
        make_face()
    extrude(amount=80, mode=Mode.SUBTRACT)
    with BuildSketch(Plane(origin=(-75, 100, -10), x_dir=(0, -1, 0), z_dir=(0, 0, -1))) as fillet5_piece_6:
        with BuildLine():
            CenterArc((FILLET5_R, -FILLET5_R), FILLET5_R, 90, 90)
            Line((0, -FILLET5_R), (0, 0))
            Line((0, 0), (FILLET5_R, 0))
        make_face()
    extrude(amount=80, mode=Mode.SUBTRACT)

    # Sketch14 → Cut-Extrude9 (cut, through all)
    with BuildSketch(Plane(origin=(24.8, 0, 0), x_dir=(0, 0, -1), z_dir=(1, 0, 0))):
        with Locations(Location((50, 151, 0), (0, 0, 25.856016698))):
            Circle(SKETCH14_R)
    extrude(amount=-CUT_EXTRUDE9_DEPTH, mode=Mode.SUBTRACT)


with BuildPart() as body_2:
    # Sketch13 → Boss-Extrude7 (new body)
    with BuildSketch(Plane(origin=(0, 0, -100), x_dir=(-1, 0, 0), z_dir=(0, 0, -1))):
        Polygon((-25, -50), (-25, -80), (25.018802851, -80), (25, -50), align=None)
    extrude(amount=BOSS_EXTRUDE7_DEPTH)

    # Fillet4
    # the kernel refuses this fillet: 10 mm, written as the material it takes off along each edge
    with BuildSketch(Plane(origin=(-25.021013242, -83.526683302, -100.1), x_dir=(0, 0, 1), z_dir=(0.0006267615930631998, 0.9999998035849335, 0))) as fillet4_piece_1:
        with BuildLine():
            CenterArc((10, 1.410673598), FILLET4_R, 180, 8.109614456)
            Line((0, 1.410673598), (0, 0))
            Line((0, 0), (0.1, 0))
        make_face()
    extrude(amount=37.053373882, mode=Mode.SUBTRACT)
    with BuildSketch(Plane(origin=(25, -46.473316005, -100.1), x_dir=(0, 0, 1), z_dir=(0, -1, 0))) as fillet4_piece_2:
        with BuildLine():
            CenterArc((10, 1.410673598), FILLET4_R, 180, 8.109614456)
            Line((0, 1.410673598), (0, 0))
            Line((0, 0), (0.1, 0))
        make_face()
    extrude(amount=37.05336799, mode=Mode.SUBTRACT)
    with BuildSketch(Plane(origin=(28.526683995, -80, -100.1), x_dir=(0, 0, 1), z_dir=(-1, 0, 0))) as fillet4_piece_3:
        with BuildLine():
            CenterArc((10, 1.410673598), FILLET4_R, 180, 8.109614456)
            Line((0, 1.410673598), (0, 0))
            Line((0, 0), (0.1, 0))
        make_face()
    extrude(amount=57.072170841, mode=Mode.SUBTRACT)


solid = Compound([part.part, body_2.part])
